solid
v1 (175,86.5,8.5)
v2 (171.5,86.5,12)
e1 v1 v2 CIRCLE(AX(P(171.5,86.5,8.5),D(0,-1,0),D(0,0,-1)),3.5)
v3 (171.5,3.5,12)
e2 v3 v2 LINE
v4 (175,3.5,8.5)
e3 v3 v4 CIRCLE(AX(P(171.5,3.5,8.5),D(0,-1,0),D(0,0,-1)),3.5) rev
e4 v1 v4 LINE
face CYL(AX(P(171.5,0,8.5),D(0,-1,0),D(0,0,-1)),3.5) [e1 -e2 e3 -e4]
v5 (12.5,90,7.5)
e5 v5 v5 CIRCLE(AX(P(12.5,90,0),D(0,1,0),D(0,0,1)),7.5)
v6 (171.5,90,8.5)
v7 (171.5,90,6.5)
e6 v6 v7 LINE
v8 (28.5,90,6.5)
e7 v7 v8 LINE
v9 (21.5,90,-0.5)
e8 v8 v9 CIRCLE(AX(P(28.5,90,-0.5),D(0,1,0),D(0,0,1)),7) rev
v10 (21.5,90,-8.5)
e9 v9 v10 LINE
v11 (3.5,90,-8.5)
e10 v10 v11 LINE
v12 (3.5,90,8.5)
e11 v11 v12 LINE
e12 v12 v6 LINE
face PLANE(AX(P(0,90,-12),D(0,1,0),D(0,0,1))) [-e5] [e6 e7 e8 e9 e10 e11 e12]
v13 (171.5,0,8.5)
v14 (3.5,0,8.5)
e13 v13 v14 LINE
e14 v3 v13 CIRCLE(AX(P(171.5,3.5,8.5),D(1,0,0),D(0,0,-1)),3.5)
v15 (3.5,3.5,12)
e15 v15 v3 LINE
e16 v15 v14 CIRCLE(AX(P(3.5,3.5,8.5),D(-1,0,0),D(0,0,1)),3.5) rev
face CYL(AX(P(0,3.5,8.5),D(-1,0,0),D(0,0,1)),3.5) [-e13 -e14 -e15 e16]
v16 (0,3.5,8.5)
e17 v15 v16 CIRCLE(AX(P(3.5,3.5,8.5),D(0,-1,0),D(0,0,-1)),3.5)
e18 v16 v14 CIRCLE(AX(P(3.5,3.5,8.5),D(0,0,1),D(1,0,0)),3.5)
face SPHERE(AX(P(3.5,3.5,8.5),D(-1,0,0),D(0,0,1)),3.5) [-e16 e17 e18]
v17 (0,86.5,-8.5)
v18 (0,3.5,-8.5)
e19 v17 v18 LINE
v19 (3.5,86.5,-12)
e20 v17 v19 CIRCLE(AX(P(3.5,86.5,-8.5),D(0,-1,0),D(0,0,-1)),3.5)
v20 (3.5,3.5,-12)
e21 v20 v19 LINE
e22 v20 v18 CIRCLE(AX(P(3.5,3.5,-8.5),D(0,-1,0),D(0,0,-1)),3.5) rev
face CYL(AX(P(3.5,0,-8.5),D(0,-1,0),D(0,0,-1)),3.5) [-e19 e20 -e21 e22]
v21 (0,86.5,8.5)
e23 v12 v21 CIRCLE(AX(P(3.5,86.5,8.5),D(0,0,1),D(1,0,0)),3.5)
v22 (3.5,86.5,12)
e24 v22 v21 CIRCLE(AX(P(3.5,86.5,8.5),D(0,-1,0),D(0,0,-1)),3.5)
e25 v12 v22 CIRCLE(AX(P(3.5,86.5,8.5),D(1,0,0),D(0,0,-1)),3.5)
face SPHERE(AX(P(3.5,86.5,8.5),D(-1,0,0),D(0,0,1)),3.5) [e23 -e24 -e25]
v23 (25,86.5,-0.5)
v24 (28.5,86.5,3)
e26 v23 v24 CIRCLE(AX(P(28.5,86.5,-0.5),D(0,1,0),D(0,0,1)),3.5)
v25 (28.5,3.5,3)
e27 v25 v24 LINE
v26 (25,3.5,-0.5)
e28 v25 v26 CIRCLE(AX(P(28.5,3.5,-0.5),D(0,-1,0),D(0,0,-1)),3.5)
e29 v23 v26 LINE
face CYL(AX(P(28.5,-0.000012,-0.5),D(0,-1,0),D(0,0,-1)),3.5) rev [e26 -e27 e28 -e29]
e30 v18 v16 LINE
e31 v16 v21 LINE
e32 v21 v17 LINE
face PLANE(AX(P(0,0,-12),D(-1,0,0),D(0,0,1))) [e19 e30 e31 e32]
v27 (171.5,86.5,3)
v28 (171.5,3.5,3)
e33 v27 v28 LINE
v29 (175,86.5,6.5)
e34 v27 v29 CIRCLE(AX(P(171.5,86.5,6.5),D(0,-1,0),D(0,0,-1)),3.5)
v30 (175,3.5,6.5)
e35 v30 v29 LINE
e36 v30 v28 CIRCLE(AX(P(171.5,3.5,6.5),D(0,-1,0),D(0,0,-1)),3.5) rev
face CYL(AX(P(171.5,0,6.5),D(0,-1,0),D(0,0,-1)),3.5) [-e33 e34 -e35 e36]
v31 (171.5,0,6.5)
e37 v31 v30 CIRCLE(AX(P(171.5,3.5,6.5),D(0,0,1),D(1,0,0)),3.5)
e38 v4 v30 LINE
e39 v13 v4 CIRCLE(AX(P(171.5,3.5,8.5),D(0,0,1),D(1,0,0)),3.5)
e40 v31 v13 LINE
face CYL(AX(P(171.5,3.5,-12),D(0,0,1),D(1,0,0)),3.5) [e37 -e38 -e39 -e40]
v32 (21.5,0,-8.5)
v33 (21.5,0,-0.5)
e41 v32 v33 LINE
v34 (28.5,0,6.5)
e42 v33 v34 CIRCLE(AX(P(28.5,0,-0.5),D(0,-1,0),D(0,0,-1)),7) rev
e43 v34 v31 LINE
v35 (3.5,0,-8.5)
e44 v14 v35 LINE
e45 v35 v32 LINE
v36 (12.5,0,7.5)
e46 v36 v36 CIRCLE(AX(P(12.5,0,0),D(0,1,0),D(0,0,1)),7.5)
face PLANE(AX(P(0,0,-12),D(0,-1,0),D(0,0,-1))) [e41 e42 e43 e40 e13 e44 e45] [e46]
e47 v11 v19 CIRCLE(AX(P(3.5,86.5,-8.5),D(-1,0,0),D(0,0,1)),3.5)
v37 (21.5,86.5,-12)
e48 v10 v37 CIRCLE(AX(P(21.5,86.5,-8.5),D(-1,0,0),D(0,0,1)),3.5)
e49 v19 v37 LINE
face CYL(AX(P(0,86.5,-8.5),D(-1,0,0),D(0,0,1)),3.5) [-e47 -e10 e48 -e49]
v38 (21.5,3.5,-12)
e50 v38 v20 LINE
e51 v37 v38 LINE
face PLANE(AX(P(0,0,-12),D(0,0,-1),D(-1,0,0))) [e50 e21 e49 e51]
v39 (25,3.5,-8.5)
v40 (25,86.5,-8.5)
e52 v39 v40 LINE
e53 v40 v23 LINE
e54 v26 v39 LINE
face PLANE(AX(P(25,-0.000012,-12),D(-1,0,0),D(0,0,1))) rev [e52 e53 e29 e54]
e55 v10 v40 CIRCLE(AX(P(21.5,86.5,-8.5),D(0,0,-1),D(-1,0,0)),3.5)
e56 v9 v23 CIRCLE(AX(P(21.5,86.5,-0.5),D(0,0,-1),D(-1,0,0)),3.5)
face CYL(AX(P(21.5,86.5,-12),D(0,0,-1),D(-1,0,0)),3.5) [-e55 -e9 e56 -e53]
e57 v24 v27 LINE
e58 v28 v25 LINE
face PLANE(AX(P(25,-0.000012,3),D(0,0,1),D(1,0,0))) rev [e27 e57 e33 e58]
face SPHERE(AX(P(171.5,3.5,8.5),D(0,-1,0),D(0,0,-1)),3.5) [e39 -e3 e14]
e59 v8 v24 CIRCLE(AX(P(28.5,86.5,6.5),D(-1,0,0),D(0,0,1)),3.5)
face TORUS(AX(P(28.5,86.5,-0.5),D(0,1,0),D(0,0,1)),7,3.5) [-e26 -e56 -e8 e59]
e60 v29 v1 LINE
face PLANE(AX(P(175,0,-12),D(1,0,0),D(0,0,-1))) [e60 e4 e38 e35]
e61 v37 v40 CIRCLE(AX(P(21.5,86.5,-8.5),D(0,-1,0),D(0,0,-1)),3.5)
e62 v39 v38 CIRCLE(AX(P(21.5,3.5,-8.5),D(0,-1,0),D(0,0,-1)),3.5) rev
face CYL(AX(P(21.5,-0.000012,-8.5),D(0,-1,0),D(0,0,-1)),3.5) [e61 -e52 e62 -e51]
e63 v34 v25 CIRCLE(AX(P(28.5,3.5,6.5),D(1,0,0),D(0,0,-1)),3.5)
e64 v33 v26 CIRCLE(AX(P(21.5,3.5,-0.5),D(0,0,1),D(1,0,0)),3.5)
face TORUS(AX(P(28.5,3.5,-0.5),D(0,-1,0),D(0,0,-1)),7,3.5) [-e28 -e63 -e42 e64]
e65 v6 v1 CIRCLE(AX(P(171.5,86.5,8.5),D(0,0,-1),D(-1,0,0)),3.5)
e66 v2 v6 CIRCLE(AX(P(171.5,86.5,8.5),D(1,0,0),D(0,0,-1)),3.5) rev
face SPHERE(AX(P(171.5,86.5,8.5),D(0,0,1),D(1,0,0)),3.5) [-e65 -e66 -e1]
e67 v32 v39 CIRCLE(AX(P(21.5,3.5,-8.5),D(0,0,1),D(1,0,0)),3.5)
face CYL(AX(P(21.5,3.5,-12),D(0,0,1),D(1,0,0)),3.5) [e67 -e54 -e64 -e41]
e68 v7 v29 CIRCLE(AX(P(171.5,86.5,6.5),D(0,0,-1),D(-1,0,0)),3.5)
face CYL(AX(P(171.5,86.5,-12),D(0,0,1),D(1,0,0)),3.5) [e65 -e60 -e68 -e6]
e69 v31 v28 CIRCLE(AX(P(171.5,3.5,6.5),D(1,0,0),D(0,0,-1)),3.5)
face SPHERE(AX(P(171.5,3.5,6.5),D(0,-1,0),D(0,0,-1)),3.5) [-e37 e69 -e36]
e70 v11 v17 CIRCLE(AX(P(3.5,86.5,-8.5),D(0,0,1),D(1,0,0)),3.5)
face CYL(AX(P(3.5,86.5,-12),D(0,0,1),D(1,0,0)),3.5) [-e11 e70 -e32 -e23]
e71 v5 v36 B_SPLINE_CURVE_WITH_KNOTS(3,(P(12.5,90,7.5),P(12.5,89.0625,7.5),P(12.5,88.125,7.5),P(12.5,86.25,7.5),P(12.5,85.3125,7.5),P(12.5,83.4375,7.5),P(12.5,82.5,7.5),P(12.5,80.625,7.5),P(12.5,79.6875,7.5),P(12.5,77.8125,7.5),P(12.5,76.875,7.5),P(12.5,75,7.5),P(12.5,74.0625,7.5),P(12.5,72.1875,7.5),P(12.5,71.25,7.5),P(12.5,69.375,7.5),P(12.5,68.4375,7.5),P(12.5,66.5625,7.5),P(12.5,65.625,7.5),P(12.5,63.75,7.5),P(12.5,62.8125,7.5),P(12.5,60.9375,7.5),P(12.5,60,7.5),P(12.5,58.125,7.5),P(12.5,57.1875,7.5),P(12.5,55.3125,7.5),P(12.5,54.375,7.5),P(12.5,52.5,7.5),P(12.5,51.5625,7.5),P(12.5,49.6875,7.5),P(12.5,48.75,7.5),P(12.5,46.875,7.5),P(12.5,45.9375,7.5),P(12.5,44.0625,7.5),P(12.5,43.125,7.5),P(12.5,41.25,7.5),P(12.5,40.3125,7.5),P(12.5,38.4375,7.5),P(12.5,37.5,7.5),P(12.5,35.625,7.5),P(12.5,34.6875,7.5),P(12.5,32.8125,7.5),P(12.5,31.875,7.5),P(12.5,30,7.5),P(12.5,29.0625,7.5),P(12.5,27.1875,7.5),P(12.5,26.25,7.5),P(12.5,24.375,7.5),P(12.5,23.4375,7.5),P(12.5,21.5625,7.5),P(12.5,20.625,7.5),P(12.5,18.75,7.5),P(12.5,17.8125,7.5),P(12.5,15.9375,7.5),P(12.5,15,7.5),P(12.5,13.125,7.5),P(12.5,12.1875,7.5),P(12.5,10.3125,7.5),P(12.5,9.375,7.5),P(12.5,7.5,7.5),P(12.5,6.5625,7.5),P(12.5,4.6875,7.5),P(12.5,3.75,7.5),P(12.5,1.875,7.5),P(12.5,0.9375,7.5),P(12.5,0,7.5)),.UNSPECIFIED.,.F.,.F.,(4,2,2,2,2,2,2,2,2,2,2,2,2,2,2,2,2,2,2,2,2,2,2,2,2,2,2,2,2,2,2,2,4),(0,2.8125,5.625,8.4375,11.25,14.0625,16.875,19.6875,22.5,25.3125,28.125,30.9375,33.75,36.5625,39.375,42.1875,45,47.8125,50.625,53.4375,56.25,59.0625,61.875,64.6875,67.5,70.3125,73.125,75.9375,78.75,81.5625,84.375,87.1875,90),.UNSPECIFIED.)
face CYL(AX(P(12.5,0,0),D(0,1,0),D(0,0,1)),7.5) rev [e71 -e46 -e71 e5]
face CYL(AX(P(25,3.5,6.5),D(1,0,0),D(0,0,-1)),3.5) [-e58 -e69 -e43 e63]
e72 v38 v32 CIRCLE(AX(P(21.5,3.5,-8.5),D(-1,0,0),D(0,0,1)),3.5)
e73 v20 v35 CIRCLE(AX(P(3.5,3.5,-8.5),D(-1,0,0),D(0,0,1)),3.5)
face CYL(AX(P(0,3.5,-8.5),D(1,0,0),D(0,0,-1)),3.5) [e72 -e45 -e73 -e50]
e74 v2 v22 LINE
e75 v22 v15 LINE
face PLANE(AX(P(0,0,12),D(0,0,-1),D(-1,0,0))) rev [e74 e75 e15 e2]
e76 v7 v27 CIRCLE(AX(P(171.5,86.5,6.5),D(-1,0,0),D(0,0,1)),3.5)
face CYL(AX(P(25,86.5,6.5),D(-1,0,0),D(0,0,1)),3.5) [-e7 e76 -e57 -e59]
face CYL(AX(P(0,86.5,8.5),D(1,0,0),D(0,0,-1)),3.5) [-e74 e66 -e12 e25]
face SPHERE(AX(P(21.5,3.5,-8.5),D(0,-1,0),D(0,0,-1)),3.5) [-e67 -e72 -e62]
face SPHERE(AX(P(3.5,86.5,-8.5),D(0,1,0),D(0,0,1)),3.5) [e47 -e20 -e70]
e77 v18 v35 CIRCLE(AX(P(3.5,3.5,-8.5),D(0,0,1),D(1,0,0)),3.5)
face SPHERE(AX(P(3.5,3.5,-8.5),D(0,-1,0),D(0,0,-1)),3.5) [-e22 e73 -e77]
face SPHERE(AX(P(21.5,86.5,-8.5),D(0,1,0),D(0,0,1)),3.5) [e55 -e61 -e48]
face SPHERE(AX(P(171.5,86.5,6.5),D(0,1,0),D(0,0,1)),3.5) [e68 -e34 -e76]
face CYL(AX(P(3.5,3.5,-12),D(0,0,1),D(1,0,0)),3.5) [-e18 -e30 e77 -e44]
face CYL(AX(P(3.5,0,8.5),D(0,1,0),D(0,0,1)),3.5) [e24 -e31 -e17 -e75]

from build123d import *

# Parameters (mm, degrees)
RESSALTO_EXTRUS_O1_DEPTH      = 12
RESSALTO_EXTRUS_O1_DEPTH_BACK = 12
ESBO_O1_W                     = 175
ESBO_O1_H                     = 90
CORTE_EXTRUS_O1_DEPTH         = 198.15222545
CORTE_EXTRUS_O1_DEPTH_BACK    = 198.15222545
ESBO_O3_W                     = 150
ESBO_O3_H                     = 15
CORTE_EXTRUS_O2_DEPTH         = 198.15222545
CORTE_EXTRUS_O2_DEPTH_BACK    = 198.15222545
ESBO_O4_R                     = 7.5
FILETE1_R                     = 3.5
FILETE2_R                     = 3.5
FILETE3_R                     = 3.5


with BuildPart() as part:
    # Esboço1 → Ressalto-extrusão1 (new, two sides: drawn at the far end of the back side and taken through both)
    with BuildSketch(Plane.XY.offset(-RESSALTO_EXTRUS_O1_DEPTH_BACK)):
        with Locations((87.5, 45)):
            Rectangle(ESBO_O1_W, ESBO_O1_H)
    extrude(amount=RESSALTO_EXTRUS_O1_DEPTH + RESSALTO_EXTRUS_O1_DEPTH_BACK)

    # Esboço3 → Corte-extrusão1 (cut, two sides: drawn at the far end of the back side and taken through both)
    with BuildSketch(Plane(origin=(0, 0, 0), x_dir=(1, 0, 0), z_dir=(0, 1, 0)).offset(-CORTE_EXTRUS_O1_DEPTH_BACK)):
        with Locations((100, 4.5)):
            Rectangle(ESBO_O3_W, ESBO_O3_H)
    extrude(amount=CORTE_EXTRUS_O1_DEPTH + CORTE_EXTRUS_O1_DEPTH_BACK, mode=Mode.SUBTRACT)

    # Esboço4 → Corte-extrusão2 (cut, two sides: drawn at the far end of the back side and taken through both)
    with BuildSketch(Plane(origin=(0, 90, 0), x_dir=(1, 0, 0), z_dir=(0, 1, 0)).offset(-CORTE_EXTRUS_O2_DEPTH_BACK)):
        with Locations(Location((12.5, 0, 0), (0, 0, 270))):
            Circle(ESBO_O4_R)
    extrude(amount=CORTE_EXTRUS_O2_DEPTH + CORTE_EXTRUS_O2_DEPTH_BACK, mode=Mode.SUBTRACT)

    # Filete1
    filete1_edges = [part.edges().sort_by_distance(p)[0] for p in [
        (25, 45, -12),
        (25, 45, 3),
        (0, 45, -12),
    ]]
    fillet(filete1_edges, radius=FILETE1_R)

    # Filete2
    filete2_edges = [part.edges().sort_by_distance(p)[0] for p in [
        (175, 45, 12),
        (87.5, 90, 12),
        (175, 45, 3),
    ]]
    fillet(filete2_edges, radius=FILETE2_R)

    # Filete3
    # the kernel refuses this fillet: 3.5 mm, written as the material it takes off along each edge
    with BuildSketch(Plane(origin=(171.5, 86.5, 8.5), x_dir=(0, 1, 0), z_dir=(1, 0, 0))) as filete3_piece_1_section:
        Polygon((0, 0), (FILETE3_R, 0), (FILETE3_R, FILETE3_R), (0, FILETE3_R), align=None)
    filete3_piece_1 = extrude(amount=FILETE3_R, mode=Mode.PRIVATE)
    filete3_piece_1 = filete3_piece_1 - Plane(origin=(171.5, 86.5, 8.5), x_dir=(0, -0.7071067811865475, -0.7071067811865475), z_dir=(1, 0, 0)) * Sphere(FILETE3_R, mode=Mode.PRIVATE)
    add(filete3_piece_1, mode=Mode.SUBTRACT)
    with BuildSketch(Plane(origin=(3.5, 3.5, 8.5), x_dir=(0, 0, 1), z_dir=(0, -1, 0))) as filete3_piece_2_section:
        Polygon((0, 0), (FILETE3_R, 0), (FILETE3_R, FILETE3_R), (0, FILETE3_R), align=None)
    filete3_piece_2 = extrude(amount=FILETE3_R, mode=Mode.PRIVATE)
    filete3_piece_2 = filete3_piece_2 - Plane(origin=(3.5, 3.5, 8.5), x_dir=(0.7071067811865475, 0, -0.7071067811865475), z_dir=(0, -1, 0)) * Sphere(FILETE3_R, mode=Mode.PRIVATE)
    add(filete3_piece_2, mode=Mode.SUBTRACT)
    with BuildSketch(Plane(origin=(3.5, 0, 12), x_dir=(0, 0, -1), z_dir=(1, 0, 0))) as filete3_piece_3:
        with BuildLine():
            CenterArc((FILETE3_R, FILETE3_R), FILETE3_R, 180, 90)
            Line((0, FILETE3_R), (0, 0))
            Line((0, 0), (FILETE3_R, 0))
        make_face()
    extrude(amount=168, mode=Mode.SUBTRACT)
    with BuildSketch(Plane(origin=(0, 0, 8.5), x_dir=(1, 0, 0), z_dir=(0, 0, -1)), Plane(origin=(0, 90, 8.5), x_dir=(0, -1, 0), z_dir=(0, 0, -1))) as filete3_piece_4:
        with BuildLine():
            CenterArc((FILETE3_R, -FILETE3_R), FILETE3_R, 90, 90)
            Line((0, -FILETE3_R), (0, 0))
            Line((0, 0), (FILETE3_R, 0))
        make_face()
    extrude(amount=17, mode=Mode.SUBTRACT)
    with BuildSketch(Plane(origin=(25, 0, -8.5), x_dir=(-1, 0, 0), z_dir=(0, 0, 1))) as filete3_piece_5:
        with BuildLine():
            CenterArc((FILETE3_R, -FILETE3_R), FILETE3_R, 90, 90)
            Line((0, -FILETE3_R), (0, 0))
            Line((0, 0), (FILETE3_R, 0))
        make_face()
    extrude(amount=8, mode=Mode.SUBTRACT)
    with BuildSketch(Plane(origin=(3.5, 0, -12), x_dir=(0, 0, 1), z_dir=(1, 0, 0))) as filete3_piece_6:
        with BuildLine():
            CenterArc((FILETE3_R, -FILETE3_R), FILETE3_R, 90, 90)
            Line((0, -FILETE3_R), (0, 0))
            Line((0, 0), (FILETE3_R, 0))
        make_face()
    extrude(amount=18, mode=Mode.SUBTRACT)
    with BuildSketch(Plane(origin=(21.5, 0, -8.5), x_dir=(0, 0, -1), z_dir=(-1, 0, 0))) as filete3_piece_7:
        with BuildLine():
            CenterArc((3.5 - FILETE3_R, -FILETE3_R), FILETE3_R, 0, 90)
            Line((3.5, -FILETE3_R), (3.5, 0))
            Line((3.5, 0), (3.5 - FILETE3_R, 0))
        make_face()
    revolve(axis=Axis((21.5, 0, -8.5), (0, -1, 0)), revolution_arc=90, mode=Mode.SUBTRACT)
    with BuildSketch(Plane(origin=(3.5, 0, -8.5), x_dir=(-1, 0, 0), z_dir=(0, 0, 1))) as filete3_piece_8:
        with BuildLine():
            CenterArc((3.5 - FILETE3_R, -FILETE3_R), FILETE3_R, 0, 90)
            Line((3.5, -FILETE3_R), (3.5, 0))
            Line((3.5, 0), (3.5 - FILETE3_R, 0))
        make_face()
    revolve(axis=Axis((3.5, 0, -8.5), (0, -1, 0)), revolution_arc=90, mode=Mode.SUBTRACT)
    with BuildSketch(Plane(origin=(21.5, 90, -12), x_dir=(0, -1, 0), z_dir=(-1, 0, 0))) as filete3_piece_9:
        with BuildLine():
            CenterArc((FILETE3_R, FILETE3_R), FILETE3_R, 180, 90)
            Line((0, FILETE3_R), (0, 0))
            Line((0, 0), (FILETE3_R, 0))
        make_face()
    extrude(amount=18, mode=Mode.SUBTRACT)
    with BuildSketch(Plane(origin=(25, 90, -0.5), x_dir=(0, -1, 0), z_dir=(0, 0, -1))) as filete3_piece_10:
        with BuildLine():
            CenterArc((FILETE3_R, FILETE3_R), FILETE3_R, 180, 90)
            Line((0, FILETE3_R), (0, 0))
            Line((0, 0), (FILETE3_R, 0))
        make_face()
    extrude(amount=8, mode=Mode.SUBTRACT)
    with BuildSketch(Plane(origin=(171.5, 90, 3), x_dir=(0, -1, 0), z_dir=(-1, 0, 0))) as filete3_piece_11:
        with BuildLine():
            CenterArc((FILETE3_R, FILETE3_R), FILETE3_R, 180, 90)
            Line((0, FILETE3_R), (0, 0))
            Line((0, 0), (FILETE3_R, 0))
        make_face()
    extrude(amount=143, mode=Mode.SUBTRACT)
    with BuildSketch(Plane(origin=(21.5, 90, -8.5), x_dir=(0, 0, -1), z_dir=(-1, 0, 0))) as filete3_piece_12:
        with BuildLine():
            CenterArc((3.5 - FILETE3_R, FILETE3_R), FILETE3_R, 270, 90)
            Line((3.5 - FILETE3_R, 0), (3.5, 0))
            Line((3.5, 0), (3.5, FILETE3_R))
        make_face()
    revolve(axis=Axis((21.5, 90, -8.5), (0, -1, 0)), revolution_arc=90, mode=Mode.SUBTRACT)
    with BuildSketch(Plane(origin=(3.5, 90, -8.5), x_dir=(-1, 0, 0), z_dir=(0, 0, 1))) as filete3_piece_13:
        with BuildLine():
            CenterArc((3.5 - FILETE3_R, FILETE3_R), FILETE3_R, 270, 90)
            Line((3.5 - FILETE3_R, 0), (3.5, 0))
            Line((3.5, 0), (3.5, FILETE3_R))
        make_face()
    revolve(axis=Axis((3.5, 90, -8.5), (0, -1, 0)), revolution_arc=90, mode=Mode.SUBTRACT)
    with BuildSketch(Plane(origin=(28.5, 90, -0.5), x_dir=(-1, 0, 0), z_dir=(0, 0, -1))) as filete3_piece_14:
        with BuildLine():
            CenterArc((3.5 + FILETE3_R, -FILETE3_R), FILETE3_R, 90, 90)
            Line((3.5 + FILETE3_R, 0), (3.5, 0))
            Line((3.5, 0), (3.5, -FILETE3_R))
        make_face()
    revolve(axis=Axis((28.5, 90, -0.5), (0, 1, 0)), revolution_arc=90, mode=Mode.SUBTRACT)
    with BuildSketch(Plane(origin=(28.5, 0, -0.5), x_dir=(-1, 0, 0), z_dir=(0, 0, -1))) as filete3_piece_15:
        with BuildLine():
            CenterArc((3.5 + FILETE3_R, FILETE3_R), FILETE3_R, 180, 90)
            Line((3.5, FILETE3_R), (3.5, 0))
            Line((3.5, 0), (3.5 + FILETE3_R, 0))
        make_face()
    revolve(axis=Axis((28.5, 0, -0.5), (0, 1, 0)), revolution_arc=90, mode=Mode.SUBTRACT)
    with BuildSketch(Plane(origin=(0, 86.5, 12), x_dir=(1, 0, 0), z_dir=(0, -1, 0))) as filete3_piece_16:
        with BuildLine():
            CenterArc((FILETE3_R, -FILETE3_R), FILETE3_R, 90, 90)
            Line((0, -FILETE3_R), (0, 0))
            Line((0, 0), (FILETE3_R, 0))
        make_face()
    extrude(amount=83, mode=Mode.SUBTRACT)
    with BuildSketch(Plane(origin=(0, 86.5, 8.5), x_dir=(0, 0, 1), z_dir=(0, -1, 0))) as filete3_piece_17:
        with BuildLine():
            CenterArc((3.5 - FILETE3_R, -FILETE3_R), FILETE3_R, 0, 90)
            Line((3.5, -FILETE3_R), (3.5, 0))
            Line((3.5, 0), (3.5 - FILETE3_R, 0))
        make_face()
    revolve(axis=Axis((0, 86.5, 8.5), (-1, 0, 0)), revolution_arc=90, mode=Mode.SUBTRACT)
    with BuildSketch(Plane(origin=(175, 90, 6.5), x_dir=(0, -1, 0), z_dir=(0, 0, 1)), Plane(origin=(175, 0, 6.5), x_dir=(-1, 0, 0), z_dir=(0, 0, 1))) as filete3_piece_18:
        with BuildLine():
            CenterArc((FILETE3_R, -FILETE3_R), FILETE3_R, 90, 90)
            Line((0, -FILETE3_R), (0, 0))
            Line((0, 0), (FILETE3_R, 0))
        make_face()
    extrude(amount=2, mode=Mode.SUBTRACT)
    with BuildSketch(Plane(origin=(171.5, 90, 6.5), x_dir=(1, 0, 0), z_dir=(0, 0, 1))) as filete3_piece_19:
        with BuildLine():
            CenterArc((3.5 - FILETE3_R, -FILETE3_R), FILETE3_R, 0, 90)
            Line((3.5 - FILETE3_R, 0), (3.5, 0))
            Line((3.5, 0), (3.5, -FILETE3_R))
        make_face()
    revolve(axis=Axis((171.5, 90, 6.5), (0, 1, 0)), revolution_arc=90, mode=Mode.SUBTRACT)
    with BuildSketch(Plane(origin=(28.5, 0, 3), x_dir=(0, 0, 1), z_dir=(1, 0, 0))) as filete3_piece_20:
        with BuildLine():
            CenterArc((FILETE3_R, -FILETE3_R), FILETE3_R, 90, 90)
            Line((0, -FILETE3_R), (0, 0))
            Line((0, 0), (FILETE3_R, 0))
        make_face()
    extrude(amount=143, mode=Mode.SUBTRACT)
    with BuildSketch(Plane(origin=(171.5, 0, 6.5), x_dir=(1, 0, 0), z_dir=(0, 0, 1))) as filete3_piece_21:
        with BuildLine():
            CenterArc((3.5 - FILETE3_R, FILETE3_R), FILETE3_R, 270, 90)
            Line((3.5, FILETE3_R), (3.5, 0))
            Line((3.5, 0), (3.5 - FILETE3_R, 0))
        make_face()
    revolve(axis=Axis((171.5, 0, 6.5), (0, 1, 0)), revolution_arc=90, mode=Mode.SUBTRACT)
    with BuildSketch(Plane(origin=(171.5, 0, 8.5), x_dir=(0, 0, 1), z_dir=(-1, 0, 0))) as filete3_piece_22:
        with BuildLine():
            CenterArc((3.5 - FILETE3_R, FILETE3_R), FILETE3_R, 270, 90)
            Line((3.5, FILETE3_R), (3.5, 0))
            Line((3.5, 0), (3.5 - FILETE3_R, 0))
        make_face()
    revolve(axis=Axis((171.5, 0, 8.5), (0, 1, 0)), revolution_arc=90, mode=Mode.SUBTRACT)


solid = part.part
